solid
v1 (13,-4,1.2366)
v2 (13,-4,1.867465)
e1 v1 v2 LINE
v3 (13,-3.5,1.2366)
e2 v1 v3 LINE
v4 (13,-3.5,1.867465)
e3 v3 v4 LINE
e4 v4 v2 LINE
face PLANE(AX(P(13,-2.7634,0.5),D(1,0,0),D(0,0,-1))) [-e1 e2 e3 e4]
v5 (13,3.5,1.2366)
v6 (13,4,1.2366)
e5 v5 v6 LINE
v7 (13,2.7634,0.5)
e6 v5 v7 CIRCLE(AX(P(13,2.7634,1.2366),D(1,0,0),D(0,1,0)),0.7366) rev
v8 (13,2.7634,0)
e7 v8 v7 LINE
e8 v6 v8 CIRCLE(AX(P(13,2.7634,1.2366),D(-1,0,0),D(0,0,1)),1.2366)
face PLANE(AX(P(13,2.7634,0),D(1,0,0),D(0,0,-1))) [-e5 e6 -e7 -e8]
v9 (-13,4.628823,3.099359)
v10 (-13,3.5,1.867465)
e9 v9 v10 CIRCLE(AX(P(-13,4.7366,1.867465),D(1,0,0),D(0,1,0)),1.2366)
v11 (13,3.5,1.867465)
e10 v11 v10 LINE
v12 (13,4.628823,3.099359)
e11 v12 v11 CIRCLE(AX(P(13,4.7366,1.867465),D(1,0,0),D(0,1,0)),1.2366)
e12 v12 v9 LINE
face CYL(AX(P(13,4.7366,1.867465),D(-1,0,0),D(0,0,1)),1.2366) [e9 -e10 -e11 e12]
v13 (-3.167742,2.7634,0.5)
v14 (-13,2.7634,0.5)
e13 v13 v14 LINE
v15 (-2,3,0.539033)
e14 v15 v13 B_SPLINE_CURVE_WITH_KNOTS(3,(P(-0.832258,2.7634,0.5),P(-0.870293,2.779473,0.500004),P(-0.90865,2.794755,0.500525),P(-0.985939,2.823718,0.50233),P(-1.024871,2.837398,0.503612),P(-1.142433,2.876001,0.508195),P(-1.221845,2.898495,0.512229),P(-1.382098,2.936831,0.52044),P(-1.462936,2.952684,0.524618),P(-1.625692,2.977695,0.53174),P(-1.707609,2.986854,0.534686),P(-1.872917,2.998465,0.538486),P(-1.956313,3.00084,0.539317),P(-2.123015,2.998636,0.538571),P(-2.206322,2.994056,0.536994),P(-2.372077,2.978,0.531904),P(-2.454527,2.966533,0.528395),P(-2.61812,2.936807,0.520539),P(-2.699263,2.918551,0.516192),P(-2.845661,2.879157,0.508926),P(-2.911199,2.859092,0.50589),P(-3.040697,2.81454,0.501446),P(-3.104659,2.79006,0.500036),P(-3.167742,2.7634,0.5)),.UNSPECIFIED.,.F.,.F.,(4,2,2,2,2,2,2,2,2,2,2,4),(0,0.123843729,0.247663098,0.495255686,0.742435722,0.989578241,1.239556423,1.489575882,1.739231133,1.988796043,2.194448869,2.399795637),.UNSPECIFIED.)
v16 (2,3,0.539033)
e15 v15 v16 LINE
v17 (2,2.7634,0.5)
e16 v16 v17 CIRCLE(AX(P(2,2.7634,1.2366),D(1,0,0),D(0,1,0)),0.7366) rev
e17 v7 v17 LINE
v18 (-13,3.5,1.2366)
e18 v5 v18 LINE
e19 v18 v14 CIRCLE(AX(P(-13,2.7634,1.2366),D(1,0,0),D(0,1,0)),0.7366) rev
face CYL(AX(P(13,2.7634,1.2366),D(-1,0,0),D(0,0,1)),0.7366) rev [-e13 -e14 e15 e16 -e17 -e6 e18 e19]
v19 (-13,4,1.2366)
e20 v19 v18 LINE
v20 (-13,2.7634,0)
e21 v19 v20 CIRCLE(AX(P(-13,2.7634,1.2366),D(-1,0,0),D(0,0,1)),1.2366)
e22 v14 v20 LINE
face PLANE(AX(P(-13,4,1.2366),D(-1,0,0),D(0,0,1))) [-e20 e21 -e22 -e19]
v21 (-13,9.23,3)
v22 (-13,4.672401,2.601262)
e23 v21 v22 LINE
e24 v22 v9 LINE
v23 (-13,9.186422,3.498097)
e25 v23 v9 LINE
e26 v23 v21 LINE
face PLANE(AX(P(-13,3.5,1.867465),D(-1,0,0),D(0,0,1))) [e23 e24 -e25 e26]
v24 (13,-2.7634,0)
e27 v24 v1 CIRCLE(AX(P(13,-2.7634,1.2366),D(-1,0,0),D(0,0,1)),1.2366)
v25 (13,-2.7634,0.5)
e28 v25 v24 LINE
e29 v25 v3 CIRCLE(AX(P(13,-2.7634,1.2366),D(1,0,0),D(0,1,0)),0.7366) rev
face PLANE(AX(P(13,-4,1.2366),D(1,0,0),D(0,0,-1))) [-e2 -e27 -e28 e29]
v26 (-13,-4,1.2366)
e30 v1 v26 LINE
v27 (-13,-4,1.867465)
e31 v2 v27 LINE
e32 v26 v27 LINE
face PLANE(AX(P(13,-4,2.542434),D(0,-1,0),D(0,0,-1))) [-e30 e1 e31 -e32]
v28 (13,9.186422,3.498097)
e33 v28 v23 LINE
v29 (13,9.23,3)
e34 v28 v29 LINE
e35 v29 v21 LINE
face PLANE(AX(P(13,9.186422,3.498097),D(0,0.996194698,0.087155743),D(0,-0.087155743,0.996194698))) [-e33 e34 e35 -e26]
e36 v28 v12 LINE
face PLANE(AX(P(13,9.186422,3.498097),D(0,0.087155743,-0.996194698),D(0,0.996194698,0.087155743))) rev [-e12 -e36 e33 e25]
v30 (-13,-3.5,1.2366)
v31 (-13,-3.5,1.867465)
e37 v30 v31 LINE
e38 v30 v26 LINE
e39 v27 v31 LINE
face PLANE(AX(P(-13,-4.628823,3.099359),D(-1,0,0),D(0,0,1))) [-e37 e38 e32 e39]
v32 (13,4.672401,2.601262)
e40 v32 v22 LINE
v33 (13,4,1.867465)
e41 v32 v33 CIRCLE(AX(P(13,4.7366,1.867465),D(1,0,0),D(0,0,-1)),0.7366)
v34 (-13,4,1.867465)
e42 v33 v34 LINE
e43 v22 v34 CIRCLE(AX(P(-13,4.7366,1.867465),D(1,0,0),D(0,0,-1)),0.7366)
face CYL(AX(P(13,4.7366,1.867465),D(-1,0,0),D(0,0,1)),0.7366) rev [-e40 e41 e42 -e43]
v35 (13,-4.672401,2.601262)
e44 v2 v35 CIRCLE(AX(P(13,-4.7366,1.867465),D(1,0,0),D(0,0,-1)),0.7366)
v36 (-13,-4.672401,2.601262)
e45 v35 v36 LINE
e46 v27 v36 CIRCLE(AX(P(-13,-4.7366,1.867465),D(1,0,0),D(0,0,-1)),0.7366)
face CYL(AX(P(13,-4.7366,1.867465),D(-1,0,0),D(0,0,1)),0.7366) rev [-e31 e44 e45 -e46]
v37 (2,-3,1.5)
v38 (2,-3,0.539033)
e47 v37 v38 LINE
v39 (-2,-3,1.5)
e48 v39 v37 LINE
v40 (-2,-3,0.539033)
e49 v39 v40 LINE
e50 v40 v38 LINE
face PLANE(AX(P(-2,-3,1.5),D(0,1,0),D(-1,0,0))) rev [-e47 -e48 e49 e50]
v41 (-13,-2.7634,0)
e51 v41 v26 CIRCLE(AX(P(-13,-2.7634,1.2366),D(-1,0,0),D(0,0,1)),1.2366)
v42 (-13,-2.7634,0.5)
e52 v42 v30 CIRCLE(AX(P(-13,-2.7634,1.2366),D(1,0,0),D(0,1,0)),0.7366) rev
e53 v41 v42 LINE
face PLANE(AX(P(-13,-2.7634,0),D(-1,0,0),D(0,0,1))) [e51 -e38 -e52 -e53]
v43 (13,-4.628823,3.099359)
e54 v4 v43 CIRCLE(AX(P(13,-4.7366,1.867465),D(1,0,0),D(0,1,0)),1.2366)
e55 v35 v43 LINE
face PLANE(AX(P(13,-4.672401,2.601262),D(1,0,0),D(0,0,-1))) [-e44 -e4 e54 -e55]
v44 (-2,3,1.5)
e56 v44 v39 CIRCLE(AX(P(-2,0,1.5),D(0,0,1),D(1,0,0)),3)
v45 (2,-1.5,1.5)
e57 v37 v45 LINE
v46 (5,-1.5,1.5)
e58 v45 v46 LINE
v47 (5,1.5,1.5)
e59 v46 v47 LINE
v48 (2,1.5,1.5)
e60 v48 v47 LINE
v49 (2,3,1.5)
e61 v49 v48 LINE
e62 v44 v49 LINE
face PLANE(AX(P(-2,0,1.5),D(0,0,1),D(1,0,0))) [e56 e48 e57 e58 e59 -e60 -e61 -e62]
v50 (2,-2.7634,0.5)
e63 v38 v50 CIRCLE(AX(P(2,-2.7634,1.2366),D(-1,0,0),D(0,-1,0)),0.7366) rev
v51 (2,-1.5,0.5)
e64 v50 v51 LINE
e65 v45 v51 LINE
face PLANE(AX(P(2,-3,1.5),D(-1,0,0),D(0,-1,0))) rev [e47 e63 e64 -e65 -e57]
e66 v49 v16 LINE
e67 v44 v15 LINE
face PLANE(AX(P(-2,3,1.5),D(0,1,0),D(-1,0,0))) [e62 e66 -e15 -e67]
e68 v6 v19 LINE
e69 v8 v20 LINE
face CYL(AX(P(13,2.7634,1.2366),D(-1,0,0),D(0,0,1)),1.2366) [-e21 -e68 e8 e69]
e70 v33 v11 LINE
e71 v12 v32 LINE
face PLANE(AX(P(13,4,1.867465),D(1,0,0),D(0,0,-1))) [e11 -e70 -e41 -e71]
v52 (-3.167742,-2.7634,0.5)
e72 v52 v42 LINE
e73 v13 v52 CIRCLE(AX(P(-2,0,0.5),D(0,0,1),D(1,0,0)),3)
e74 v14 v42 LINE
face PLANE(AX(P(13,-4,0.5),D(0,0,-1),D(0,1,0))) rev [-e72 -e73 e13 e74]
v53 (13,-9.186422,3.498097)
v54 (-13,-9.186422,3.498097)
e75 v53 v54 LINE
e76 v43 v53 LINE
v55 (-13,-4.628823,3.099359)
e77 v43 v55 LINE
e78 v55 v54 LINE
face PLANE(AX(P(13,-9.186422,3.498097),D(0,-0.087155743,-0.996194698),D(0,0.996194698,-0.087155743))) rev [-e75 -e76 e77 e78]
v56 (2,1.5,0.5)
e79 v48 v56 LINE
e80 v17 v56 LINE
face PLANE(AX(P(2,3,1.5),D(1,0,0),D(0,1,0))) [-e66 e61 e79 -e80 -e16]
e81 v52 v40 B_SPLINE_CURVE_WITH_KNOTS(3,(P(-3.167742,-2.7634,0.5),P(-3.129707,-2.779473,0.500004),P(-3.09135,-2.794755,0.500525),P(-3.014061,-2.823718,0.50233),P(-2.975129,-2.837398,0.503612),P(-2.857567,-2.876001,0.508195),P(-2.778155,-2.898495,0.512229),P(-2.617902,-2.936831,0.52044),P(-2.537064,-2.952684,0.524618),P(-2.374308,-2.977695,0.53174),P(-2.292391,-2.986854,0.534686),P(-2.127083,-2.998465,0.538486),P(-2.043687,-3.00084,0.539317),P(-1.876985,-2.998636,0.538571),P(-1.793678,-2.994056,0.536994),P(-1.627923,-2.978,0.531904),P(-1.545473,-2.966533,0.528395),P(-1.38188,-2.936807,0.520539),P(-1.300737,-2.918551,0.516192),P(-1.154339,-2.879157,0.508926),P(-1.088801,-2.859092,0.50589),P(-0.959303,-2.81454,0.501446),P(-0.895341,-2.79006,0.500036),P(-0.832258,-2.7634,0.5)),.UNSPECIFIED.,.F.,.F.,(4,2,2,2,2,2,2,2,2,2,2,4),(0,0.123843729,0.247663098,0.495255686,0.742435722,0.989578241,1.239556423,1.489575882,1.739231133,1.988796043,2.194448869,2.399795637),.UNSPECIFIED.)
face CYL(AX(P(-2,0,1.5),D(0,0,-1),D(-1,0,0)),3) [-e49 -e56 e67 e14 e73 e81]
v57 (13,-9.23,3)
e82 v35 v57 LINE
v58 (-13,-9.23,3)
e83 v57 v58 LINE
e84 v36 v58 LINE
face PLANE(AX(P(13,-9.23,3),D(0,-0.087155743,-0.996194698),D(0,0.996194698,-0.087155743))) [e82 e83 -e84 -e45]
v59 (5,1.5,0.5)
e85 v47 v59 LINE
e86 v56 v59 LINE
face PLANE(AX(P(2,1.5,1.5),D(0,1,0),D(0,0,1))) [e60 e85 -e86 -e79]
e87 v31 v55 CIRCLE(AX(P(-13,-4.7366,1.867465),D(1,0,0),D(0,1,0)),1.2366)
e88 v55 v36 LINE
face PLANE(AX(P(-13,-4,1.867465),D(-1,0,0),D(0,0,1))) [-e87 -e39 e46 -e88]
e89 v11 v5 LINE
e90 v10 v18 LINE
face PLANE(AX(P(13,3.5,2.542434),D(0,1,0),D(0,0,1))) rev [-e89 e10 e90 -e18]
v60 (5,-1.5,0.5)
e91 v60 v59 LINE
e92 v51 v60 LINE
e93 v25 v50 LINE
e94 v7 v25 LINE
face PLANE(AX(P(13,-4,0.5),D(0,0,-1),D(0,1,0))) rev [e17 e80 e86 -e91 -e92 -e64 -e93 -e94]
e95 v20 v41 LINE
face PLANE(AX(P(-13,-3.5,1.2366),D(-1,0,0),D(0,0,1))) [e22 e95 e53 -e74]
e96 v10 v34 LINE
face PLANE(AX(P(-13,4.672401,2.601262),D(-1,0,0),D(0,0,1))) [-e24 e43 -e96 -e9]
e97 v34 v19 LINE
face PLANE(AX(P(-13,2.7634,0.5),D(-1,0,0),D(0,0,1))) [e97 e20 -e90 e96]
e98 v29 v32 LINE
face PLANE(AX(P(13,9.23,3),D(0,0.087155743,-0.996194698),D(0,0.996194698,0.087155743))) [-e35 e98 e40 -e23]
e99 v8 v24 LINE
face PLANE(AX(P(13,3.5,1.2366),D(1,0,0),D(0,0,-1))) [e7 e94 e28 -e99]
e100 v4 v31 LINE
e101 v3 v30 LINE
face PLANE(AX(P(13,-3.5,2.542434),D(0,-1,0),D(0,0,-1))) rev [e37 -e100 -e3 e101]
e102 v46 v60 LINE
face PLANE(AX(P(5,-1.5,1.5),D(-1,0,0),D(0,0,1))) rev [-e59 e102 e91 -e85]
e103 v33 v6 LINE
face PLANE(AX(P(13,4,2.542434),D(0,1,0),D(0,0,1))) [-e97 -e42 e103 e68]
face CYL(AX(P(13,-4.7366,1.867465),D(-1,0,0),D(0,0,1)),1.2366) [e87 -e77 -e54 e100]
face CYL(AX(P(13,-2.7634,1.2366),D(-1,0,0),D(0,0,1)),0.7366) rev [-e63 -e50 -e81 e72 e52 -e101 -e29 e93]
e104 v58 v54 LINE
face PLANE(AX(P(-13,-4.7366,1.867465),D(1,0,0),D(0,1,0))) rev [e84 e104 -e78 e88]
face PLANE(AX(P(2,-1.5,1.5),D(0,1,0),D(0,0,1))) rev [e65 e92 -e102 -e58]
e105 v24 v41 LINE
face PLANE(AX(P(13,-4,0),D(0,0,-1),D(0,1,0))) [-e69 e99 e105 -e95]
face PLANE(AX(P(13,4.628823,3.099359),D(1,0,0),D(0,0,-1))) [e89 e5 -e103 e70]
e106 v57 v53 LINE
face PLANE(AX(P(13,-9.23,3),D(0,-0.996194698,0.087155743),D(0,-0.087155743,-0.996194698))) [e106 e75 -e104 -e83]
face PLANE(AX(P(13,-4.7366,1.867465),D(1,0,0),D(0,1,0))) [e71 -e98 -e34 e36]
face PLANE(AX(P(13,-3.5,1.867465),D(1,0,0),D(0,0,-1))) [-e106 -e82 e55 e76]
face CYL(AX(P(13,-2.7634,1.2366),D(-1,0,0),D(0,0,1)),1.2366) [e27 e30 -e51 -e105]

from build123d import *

# Parameters (mm, degrees)
BASE_FLANGE1_DEPTH  = 13
BOSS_EXTRUDE2_DEPTH = 1


# Sheet-metal steps are written as plain solids
with BuildPart() as part:
    # Sketch1 → Base-Flange1 (new, symmetric)
    with BuildSketch(Plane.YZ):
        with BuildLine():
            Line((-9.23, 3), (-4.67240108, 2.601261762))
            ThreePointArc((-4.67240108, 2.601261762), (-4.193521514, 2.365104494), (-4, 1.867464747))
            Line((-4, 1.867464747), (-4, 1.2366))
            ThreePointArc((-4, 1.2366), (-3.637808246, 0.362191754), (-2.7634, 0))
            Line((-2.7634, 0), (2.7634, 0))
            ThreePointArc((2.7634, 0), (3.637808246, 0.362191754), (4, 1.2366))
            Line((4, 1.2366), (4, 1.867464747))
            ThreePointArc((4, 1.867464747), (4.193521514, 2.365104494), (4.67240108, 2.601261762))
            Line((4.67240108, 2.601261762), (9.23, 3))
            Line((9.23, 3), (9.186422129, 3.498097349))
            Line((9.186422129, 3.498097349), (4.628823209, 3.099359111))
            ThreePointArc((4.628823209, 3.099359111), (3.824882845, 2.702899598), (3.5, 1.867464747))
            Line((3.5, 1.867464747), (3.5, 1.2366))
            ThreePointArc((3.5, 1.2366), (3.284254855, 0.715745145), (2.7634, 0.5))
            Line((2.7634, 0.5), (-2.7634, 0.5))
            ThreePointArc((-2.7634, 0.5), (-3.284254855, 0.715745145), (-3.5, 1.2366))
            Line((-3.5, 1.2366), (-3.5, 1.867464747))
            ThreePointArc((-3.5, 1.867464747), (-3.824882845, 2.702899598), (-4.628823209, 3.099359111))
            Line((-4.628823209, 3.099359111), (-9.186422129, 3.498097349))
            Line((-9.186422129, 3.498097349), (-9.23, 3))
        make_face()
    extrude(amount=BASE_FLANGE1_DEPTH, both=True)

    # Sketch6 → Boss-Extrude2 (add)
    with BuildSketch(Plane.XY.offset(0.5)):
        with BuildLine():
            Line((-2, 3), (2, 3))
            Line((2, 3), (2, 1.5))
            Line((2, 1.5), (5, 1.5))
            Line((5, 1.5), (5, -1.5))
            Line((5, -1.5), (2, -1.5))
            Line((2, -1.5), (2, -3))
            Line((2, -3), (-2, -3))
            ThreePointArc((-2, -3), (-5, 0), (-2, 3))
        make_face()
    extrude(amount=BOSS_EXTRUDE2_DEPTH)


solid = part.part
